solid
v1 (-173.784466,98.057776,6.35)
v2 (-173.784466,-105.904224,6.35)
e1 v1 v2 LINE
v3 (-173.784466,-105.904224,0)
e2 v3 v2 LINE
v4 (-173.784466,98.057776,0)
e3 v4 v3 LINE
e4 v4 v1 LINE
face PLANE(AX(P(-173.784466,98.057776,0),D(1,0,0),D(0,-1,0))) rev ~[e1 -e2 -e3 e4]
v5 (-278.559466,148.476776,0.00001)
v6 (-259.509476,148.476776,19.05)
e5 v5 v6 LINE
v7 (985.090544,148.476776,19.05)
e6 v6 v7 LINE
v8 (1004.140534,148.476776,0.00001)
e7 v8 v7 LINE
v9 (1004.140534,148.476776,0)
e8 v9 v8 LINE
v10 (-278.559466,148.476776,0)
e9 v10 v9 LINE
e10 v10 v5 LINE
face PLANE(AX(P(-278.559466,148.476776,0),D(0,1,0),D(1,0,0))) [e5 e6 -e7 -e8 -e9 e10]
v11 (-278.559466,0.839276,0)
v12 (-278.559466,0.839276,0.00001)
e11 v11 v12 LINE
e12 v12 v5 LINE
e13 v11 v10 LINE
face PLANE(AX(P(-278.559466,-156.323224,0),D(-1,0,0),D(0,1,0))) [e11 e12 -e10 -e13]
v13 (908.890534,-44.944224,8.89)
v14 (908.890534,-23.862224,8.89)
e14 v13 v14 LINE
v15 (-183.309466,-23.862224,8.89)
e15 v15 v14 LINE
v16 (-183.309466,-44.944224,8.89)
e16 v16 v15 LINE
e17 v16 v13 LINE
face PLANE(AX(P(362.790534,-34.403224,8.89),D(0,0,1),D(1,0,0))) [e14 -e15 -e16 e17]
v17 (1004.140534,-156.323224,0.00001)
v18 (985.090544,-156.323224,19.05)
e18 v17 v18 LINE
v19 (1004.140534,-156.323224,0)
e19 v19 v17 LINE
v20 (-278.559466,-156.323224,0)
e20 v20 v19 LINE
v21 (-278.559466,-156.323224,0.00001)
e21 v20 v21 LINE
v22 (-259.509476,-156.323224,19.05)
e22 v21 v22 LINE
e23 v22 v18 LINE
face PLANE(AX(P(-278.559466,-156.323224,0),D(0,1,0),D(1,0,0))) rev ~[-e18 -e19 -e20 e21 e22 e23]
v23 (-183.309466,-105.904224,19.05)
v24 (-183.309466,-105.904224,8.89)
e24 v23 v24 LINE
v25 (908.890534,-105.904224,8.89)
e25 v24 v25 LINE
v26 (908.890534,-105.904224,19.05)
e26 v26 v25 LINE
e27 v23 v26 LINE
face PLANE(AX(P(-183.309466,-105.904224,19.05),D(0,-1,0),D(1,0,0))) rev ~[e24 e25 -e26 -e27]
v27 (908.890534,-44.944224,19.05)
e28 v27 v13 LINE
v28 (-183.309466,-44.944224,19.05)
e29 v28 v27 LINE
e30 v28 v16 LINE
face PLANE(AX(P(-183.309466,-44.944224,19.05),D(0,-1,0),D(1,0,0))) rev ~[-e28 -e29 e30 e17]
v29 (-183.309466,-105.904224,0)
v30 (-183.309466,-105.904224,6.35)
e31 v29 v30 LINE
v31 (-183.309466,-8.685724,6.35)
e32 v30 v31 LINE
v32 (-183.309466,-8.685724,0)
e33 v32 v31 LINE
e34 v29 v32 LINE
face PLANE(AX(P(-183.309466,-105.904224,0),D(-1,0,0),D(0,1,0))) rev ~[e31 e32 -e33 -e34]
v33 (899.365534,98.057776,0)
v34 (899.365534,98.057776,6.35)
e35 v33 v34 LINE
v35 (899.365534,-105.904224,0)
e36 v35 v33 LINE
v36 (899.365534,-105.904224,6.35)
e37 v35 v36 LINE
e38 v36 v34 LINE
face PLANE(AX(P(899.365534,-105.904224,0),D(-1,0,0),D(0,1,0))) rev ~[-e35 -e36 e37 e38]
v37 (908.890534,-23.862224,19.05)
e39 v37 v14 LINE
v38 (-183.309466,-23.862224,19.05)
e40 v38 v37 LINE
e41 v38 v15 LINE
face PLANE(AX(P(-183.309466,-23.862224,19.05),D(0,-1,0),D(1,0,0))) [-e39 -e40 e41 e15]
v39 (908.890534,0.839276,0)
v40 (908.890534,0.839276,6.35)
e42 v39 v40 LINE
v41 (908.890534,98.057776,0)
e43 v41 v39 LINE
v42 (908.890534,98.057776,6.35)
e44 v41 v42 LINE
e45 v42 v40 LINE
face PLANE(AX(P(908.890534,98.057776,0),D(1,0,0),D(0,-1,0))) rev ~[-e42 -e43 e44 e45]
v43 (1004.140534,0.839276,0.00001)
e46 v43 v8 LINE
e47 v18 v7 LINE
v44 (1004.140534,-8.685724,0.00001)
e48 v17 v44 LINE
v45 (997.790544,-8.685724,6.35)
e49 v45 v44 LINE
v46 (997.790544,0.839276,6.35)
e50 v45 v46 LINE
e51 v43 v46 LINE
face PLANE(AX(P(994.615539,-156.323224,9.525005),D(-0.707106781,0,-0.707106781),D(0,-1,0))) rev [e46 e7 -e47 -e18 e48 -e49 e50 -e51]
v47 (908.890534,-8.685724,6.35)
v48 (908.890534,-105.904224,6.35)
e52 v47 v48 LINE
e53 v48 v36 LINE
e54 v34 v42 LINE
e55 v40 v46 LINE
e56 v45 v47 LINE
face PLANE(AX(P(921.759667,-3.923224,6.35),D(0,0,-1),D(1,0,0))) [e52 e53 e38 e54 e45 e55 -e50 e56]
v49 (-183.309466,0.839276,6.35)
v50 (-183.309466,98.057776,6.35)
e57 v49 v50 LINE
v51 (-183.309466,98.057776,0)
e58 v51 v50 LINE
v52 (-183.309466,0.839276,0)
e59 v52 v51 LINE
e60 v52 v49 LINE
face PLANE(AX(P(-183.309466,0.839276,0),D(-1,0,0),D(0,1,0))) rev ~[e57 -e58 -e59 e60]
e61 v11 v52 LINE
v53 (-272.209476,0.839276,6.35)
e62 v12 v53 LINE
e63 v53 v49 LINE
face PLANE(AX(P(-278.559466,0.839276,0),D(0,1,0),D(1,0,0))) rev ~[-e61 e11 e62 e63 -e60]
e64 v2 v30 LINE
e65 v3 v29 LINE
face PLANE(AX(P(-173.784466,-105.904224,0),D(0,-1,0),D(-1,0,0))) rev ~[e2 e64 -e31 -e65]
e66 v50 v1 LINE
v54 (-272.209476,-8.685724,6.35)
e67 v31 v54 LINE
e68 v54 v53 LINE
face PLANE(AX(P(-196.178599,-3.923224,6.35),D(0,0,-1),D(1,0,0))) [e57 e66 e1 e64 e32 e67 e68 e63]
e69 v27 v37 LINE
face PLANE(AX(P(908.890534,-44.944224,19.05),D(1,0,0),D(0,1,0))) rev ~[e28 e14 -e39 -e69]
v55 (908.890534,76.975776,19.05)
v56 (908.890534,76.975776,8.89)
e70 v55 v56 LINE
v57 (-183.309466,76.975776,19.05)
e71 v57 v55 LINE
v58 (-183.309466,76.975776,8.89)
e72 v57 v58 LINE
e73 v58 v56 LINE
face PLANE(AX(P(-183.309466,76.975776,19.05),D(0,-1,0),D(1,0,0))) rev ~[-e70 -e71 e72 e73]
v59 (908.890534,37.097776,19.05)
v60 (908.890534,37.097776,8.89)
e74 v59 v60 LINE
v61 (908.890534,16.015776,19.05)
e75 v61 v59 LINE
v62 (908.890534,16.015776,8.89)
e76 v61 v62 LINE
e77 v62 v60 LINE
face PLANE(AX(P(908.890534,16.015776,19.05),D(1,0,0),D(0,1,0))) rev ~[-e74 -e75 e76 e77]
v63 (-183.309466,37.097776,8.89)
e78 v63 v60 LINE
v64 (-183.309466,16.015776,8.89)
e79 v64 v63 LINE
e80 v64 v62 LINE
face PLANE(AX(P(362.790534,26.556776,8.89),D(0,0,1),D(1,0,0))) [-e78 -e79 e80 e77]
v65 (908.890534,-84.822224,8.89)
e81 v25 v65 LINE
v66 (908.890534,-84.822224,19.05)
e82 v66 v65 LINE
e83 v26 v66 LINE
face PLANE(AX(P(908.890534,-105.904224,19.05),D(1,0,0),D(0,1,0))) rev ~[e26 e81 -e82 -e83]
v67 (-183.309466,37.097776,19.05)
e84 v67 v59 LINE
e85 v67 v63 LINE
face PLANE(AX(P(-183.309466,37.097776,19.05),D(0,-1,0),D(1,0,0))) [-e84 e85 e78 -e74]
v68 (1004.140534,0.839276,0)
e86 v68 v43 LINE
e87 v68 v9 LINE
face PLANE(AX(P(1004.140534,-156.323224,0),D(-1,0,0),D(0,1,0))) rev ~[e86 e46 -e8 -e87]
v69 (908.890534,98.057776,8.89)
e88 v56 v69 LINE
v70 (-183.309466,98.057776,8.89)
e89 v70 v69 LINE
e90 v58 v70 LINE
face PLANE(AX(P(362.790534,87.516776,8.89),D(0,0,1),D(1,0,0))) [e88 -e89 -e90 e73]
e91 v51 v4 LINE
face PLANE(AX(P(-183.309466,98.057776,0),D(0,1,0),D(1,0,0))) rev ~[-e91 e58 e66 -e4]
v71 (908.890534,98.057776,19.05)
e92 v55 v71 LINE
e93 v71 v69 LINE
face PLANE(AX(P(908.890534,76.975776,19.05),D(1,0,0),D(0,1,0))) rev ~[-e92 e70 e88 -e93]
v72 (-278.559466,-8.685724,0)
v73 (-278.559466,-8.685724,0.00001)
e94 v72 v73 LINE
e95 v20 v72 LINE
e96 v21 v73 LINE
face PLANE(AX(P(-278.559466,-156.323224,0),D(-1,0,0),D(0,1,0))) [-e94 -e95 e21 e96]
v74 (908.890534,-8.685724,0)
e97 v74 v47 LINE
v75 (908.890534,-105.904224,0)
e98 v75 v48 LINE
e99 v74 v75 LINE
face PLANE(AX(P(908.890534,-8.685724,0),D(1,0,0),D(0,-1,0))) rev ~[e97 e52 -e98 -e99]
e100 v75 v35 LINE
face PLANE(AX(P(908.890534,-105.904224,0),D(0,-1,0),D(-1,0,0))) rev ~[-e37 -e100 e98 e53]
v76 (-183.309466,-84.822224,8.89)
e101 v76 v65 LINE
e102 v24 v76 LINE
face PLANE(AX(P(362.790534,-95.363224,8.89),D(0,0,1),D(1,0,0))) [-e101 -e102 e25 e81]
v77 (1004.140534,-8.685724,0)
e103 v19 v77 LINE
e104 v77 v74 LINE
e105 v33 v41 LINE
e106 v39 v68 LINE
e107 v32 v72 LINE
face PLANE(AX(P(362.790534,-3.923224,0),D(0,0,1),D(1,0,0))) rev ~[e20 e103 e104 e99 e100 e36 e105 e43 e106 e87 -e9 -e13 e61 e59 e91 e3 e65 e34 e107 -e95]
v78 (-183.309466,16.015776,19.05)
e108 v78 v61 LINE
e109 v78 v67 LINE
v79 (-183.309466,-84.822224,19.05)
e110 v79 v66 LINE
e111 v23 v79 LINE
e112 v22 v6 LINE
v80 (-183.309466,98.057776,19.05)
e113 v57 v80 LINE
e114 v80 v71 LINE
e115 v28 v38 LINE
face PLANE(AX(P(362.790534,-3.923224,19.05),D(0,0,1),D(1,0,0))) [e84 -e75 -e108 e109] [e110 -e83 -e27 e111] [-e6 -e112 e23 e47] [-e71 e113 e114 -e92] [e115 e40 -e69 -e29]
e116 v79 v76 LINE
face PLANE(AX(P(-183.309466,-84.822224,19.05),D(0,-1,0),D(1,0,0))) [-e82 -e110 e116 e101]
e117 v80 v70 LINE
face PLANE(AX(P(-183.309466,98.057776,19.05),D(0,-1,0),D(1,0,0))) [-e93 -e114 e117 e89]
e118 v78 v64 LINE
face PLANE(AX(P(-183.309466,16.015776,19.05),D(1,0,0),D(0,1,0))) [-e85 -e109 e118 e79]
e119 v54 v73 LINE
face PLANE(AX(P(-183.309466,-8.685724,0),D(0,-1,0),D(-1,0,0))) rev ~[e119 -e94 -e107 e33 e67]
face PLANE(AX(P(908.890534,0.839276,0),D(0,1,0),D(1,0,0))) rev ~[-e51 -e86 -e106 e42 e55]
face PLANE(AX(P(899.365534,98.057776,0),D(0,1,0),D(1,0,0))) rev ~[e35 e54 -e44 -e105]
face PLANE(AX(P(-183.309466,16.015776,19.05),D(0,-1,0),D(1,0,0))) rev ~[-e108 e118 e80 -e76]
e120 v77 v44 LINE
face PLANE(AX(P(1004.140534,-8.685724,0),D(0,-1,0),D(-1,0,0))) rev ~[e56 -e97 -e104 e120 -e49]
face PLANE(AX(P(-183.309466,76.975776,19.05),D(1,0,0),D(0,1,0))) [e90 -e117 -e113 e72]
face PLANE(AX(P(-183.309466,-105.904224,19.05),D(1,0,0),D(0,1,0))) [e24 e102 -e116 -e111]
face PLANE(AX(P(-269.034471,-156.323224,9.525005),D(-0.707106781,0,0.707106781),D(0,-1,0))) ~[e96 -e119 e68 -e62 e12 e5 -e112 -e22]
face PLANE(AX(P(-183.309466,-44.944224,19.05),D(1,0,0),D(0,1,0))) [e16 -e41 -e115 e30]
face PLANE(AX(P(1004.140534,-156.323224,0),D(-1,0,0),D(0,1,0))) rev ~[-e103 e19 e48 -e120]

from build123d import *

# Parameters (mm, degrees)
F0_W     = 1282.7
F0_H     = 304.8
F1_DEPTH = 19.05
F2_SIZE  = 19.04999
F3_W     = 1092.2
F3_H     = 21.082
F4_DEPTH = 10.16
F6_DEPTH = 6.35


# Not quite as in the source:
# - a fillet or chamfer is up to 0.001 mm smaller than in the source, because OpenCascade refuses the exact size


with BuildPart() as f1:
    # F0 (on Top) → F1 (new body)
    with BuildSketch(Plane.XY):
        with Locations((362.7905342946, -3.9232242852)):
            Rectangle(F0_W, F0_H)
    extrude(amount=F1_DEPTH)

    # F2 (size 19.05 in the source; OpenCascade refuses exactly that, so slightly less here)
    f2_edges = [f1.edges().sort_by_distance(p)[0] for p in [
        (1004.140534, -3.923224, 19.05),
        (-278.559466, -3.923224, 19.05),
    ]]
    chamfer(f2_edges, length=F2_SIZE)

    # F3 (on face) → F4 (cut)
    with BuildSketch(Plane.XY.offset(19.05)):
        with Locations((362.7905342946, 87.5167757148)):
            Rectangle(F3_W, F3_H)
        with Locations((362.7905342946, 26.5567757148)):
            Rectangle(F3_W, F3_H)
        with Locations((362.7905342946, -34.4032242852)):
            Rectangle(F3_W, F3_H)
        with Locations((362.7905342946, -95.3632242852)):
            Rectangle(F3_W, F3_H)
    extrude(amount=-F4_DEPTH, mode=Mode.SUBTRACT)

    # F5 (on face) → F6 (cut)
    with BuildSketch(Plane(origin=(0, 0, 0), x_dir=(1, 0, 0), z_dir=(0, 0, -1))):
        Polygon((899.3655342946, 105.9042242852), (899.3655342946, -98.0577757148), (908.8905342946, -98.0577757148), (908.8905342946, -0.8392757148), (1004.1405342946, -0.8392757148), (1004.1405342946, 8.6857242852), (908.8905342946, 8.6857242852), (908.8905342946, 105.9042242852), align=None)
        Polygon((-278.5594657054, 8.6857242852), (-278.5594657054, -0.8392757148), (-183.3094657054, -0.8392757148), (-183.3094657054, -98.0577757148), (-173.7844657054, -98.0577757148), (-173.7844657054, 105.9042242852), (-183.3094657054, 105.9042242852), (-183.3094657054, 8.6857242852), align=None)
    extrude(amount=-F6_DEPTH, mode=Mode.SUBTRACT)


solid = f1.part
